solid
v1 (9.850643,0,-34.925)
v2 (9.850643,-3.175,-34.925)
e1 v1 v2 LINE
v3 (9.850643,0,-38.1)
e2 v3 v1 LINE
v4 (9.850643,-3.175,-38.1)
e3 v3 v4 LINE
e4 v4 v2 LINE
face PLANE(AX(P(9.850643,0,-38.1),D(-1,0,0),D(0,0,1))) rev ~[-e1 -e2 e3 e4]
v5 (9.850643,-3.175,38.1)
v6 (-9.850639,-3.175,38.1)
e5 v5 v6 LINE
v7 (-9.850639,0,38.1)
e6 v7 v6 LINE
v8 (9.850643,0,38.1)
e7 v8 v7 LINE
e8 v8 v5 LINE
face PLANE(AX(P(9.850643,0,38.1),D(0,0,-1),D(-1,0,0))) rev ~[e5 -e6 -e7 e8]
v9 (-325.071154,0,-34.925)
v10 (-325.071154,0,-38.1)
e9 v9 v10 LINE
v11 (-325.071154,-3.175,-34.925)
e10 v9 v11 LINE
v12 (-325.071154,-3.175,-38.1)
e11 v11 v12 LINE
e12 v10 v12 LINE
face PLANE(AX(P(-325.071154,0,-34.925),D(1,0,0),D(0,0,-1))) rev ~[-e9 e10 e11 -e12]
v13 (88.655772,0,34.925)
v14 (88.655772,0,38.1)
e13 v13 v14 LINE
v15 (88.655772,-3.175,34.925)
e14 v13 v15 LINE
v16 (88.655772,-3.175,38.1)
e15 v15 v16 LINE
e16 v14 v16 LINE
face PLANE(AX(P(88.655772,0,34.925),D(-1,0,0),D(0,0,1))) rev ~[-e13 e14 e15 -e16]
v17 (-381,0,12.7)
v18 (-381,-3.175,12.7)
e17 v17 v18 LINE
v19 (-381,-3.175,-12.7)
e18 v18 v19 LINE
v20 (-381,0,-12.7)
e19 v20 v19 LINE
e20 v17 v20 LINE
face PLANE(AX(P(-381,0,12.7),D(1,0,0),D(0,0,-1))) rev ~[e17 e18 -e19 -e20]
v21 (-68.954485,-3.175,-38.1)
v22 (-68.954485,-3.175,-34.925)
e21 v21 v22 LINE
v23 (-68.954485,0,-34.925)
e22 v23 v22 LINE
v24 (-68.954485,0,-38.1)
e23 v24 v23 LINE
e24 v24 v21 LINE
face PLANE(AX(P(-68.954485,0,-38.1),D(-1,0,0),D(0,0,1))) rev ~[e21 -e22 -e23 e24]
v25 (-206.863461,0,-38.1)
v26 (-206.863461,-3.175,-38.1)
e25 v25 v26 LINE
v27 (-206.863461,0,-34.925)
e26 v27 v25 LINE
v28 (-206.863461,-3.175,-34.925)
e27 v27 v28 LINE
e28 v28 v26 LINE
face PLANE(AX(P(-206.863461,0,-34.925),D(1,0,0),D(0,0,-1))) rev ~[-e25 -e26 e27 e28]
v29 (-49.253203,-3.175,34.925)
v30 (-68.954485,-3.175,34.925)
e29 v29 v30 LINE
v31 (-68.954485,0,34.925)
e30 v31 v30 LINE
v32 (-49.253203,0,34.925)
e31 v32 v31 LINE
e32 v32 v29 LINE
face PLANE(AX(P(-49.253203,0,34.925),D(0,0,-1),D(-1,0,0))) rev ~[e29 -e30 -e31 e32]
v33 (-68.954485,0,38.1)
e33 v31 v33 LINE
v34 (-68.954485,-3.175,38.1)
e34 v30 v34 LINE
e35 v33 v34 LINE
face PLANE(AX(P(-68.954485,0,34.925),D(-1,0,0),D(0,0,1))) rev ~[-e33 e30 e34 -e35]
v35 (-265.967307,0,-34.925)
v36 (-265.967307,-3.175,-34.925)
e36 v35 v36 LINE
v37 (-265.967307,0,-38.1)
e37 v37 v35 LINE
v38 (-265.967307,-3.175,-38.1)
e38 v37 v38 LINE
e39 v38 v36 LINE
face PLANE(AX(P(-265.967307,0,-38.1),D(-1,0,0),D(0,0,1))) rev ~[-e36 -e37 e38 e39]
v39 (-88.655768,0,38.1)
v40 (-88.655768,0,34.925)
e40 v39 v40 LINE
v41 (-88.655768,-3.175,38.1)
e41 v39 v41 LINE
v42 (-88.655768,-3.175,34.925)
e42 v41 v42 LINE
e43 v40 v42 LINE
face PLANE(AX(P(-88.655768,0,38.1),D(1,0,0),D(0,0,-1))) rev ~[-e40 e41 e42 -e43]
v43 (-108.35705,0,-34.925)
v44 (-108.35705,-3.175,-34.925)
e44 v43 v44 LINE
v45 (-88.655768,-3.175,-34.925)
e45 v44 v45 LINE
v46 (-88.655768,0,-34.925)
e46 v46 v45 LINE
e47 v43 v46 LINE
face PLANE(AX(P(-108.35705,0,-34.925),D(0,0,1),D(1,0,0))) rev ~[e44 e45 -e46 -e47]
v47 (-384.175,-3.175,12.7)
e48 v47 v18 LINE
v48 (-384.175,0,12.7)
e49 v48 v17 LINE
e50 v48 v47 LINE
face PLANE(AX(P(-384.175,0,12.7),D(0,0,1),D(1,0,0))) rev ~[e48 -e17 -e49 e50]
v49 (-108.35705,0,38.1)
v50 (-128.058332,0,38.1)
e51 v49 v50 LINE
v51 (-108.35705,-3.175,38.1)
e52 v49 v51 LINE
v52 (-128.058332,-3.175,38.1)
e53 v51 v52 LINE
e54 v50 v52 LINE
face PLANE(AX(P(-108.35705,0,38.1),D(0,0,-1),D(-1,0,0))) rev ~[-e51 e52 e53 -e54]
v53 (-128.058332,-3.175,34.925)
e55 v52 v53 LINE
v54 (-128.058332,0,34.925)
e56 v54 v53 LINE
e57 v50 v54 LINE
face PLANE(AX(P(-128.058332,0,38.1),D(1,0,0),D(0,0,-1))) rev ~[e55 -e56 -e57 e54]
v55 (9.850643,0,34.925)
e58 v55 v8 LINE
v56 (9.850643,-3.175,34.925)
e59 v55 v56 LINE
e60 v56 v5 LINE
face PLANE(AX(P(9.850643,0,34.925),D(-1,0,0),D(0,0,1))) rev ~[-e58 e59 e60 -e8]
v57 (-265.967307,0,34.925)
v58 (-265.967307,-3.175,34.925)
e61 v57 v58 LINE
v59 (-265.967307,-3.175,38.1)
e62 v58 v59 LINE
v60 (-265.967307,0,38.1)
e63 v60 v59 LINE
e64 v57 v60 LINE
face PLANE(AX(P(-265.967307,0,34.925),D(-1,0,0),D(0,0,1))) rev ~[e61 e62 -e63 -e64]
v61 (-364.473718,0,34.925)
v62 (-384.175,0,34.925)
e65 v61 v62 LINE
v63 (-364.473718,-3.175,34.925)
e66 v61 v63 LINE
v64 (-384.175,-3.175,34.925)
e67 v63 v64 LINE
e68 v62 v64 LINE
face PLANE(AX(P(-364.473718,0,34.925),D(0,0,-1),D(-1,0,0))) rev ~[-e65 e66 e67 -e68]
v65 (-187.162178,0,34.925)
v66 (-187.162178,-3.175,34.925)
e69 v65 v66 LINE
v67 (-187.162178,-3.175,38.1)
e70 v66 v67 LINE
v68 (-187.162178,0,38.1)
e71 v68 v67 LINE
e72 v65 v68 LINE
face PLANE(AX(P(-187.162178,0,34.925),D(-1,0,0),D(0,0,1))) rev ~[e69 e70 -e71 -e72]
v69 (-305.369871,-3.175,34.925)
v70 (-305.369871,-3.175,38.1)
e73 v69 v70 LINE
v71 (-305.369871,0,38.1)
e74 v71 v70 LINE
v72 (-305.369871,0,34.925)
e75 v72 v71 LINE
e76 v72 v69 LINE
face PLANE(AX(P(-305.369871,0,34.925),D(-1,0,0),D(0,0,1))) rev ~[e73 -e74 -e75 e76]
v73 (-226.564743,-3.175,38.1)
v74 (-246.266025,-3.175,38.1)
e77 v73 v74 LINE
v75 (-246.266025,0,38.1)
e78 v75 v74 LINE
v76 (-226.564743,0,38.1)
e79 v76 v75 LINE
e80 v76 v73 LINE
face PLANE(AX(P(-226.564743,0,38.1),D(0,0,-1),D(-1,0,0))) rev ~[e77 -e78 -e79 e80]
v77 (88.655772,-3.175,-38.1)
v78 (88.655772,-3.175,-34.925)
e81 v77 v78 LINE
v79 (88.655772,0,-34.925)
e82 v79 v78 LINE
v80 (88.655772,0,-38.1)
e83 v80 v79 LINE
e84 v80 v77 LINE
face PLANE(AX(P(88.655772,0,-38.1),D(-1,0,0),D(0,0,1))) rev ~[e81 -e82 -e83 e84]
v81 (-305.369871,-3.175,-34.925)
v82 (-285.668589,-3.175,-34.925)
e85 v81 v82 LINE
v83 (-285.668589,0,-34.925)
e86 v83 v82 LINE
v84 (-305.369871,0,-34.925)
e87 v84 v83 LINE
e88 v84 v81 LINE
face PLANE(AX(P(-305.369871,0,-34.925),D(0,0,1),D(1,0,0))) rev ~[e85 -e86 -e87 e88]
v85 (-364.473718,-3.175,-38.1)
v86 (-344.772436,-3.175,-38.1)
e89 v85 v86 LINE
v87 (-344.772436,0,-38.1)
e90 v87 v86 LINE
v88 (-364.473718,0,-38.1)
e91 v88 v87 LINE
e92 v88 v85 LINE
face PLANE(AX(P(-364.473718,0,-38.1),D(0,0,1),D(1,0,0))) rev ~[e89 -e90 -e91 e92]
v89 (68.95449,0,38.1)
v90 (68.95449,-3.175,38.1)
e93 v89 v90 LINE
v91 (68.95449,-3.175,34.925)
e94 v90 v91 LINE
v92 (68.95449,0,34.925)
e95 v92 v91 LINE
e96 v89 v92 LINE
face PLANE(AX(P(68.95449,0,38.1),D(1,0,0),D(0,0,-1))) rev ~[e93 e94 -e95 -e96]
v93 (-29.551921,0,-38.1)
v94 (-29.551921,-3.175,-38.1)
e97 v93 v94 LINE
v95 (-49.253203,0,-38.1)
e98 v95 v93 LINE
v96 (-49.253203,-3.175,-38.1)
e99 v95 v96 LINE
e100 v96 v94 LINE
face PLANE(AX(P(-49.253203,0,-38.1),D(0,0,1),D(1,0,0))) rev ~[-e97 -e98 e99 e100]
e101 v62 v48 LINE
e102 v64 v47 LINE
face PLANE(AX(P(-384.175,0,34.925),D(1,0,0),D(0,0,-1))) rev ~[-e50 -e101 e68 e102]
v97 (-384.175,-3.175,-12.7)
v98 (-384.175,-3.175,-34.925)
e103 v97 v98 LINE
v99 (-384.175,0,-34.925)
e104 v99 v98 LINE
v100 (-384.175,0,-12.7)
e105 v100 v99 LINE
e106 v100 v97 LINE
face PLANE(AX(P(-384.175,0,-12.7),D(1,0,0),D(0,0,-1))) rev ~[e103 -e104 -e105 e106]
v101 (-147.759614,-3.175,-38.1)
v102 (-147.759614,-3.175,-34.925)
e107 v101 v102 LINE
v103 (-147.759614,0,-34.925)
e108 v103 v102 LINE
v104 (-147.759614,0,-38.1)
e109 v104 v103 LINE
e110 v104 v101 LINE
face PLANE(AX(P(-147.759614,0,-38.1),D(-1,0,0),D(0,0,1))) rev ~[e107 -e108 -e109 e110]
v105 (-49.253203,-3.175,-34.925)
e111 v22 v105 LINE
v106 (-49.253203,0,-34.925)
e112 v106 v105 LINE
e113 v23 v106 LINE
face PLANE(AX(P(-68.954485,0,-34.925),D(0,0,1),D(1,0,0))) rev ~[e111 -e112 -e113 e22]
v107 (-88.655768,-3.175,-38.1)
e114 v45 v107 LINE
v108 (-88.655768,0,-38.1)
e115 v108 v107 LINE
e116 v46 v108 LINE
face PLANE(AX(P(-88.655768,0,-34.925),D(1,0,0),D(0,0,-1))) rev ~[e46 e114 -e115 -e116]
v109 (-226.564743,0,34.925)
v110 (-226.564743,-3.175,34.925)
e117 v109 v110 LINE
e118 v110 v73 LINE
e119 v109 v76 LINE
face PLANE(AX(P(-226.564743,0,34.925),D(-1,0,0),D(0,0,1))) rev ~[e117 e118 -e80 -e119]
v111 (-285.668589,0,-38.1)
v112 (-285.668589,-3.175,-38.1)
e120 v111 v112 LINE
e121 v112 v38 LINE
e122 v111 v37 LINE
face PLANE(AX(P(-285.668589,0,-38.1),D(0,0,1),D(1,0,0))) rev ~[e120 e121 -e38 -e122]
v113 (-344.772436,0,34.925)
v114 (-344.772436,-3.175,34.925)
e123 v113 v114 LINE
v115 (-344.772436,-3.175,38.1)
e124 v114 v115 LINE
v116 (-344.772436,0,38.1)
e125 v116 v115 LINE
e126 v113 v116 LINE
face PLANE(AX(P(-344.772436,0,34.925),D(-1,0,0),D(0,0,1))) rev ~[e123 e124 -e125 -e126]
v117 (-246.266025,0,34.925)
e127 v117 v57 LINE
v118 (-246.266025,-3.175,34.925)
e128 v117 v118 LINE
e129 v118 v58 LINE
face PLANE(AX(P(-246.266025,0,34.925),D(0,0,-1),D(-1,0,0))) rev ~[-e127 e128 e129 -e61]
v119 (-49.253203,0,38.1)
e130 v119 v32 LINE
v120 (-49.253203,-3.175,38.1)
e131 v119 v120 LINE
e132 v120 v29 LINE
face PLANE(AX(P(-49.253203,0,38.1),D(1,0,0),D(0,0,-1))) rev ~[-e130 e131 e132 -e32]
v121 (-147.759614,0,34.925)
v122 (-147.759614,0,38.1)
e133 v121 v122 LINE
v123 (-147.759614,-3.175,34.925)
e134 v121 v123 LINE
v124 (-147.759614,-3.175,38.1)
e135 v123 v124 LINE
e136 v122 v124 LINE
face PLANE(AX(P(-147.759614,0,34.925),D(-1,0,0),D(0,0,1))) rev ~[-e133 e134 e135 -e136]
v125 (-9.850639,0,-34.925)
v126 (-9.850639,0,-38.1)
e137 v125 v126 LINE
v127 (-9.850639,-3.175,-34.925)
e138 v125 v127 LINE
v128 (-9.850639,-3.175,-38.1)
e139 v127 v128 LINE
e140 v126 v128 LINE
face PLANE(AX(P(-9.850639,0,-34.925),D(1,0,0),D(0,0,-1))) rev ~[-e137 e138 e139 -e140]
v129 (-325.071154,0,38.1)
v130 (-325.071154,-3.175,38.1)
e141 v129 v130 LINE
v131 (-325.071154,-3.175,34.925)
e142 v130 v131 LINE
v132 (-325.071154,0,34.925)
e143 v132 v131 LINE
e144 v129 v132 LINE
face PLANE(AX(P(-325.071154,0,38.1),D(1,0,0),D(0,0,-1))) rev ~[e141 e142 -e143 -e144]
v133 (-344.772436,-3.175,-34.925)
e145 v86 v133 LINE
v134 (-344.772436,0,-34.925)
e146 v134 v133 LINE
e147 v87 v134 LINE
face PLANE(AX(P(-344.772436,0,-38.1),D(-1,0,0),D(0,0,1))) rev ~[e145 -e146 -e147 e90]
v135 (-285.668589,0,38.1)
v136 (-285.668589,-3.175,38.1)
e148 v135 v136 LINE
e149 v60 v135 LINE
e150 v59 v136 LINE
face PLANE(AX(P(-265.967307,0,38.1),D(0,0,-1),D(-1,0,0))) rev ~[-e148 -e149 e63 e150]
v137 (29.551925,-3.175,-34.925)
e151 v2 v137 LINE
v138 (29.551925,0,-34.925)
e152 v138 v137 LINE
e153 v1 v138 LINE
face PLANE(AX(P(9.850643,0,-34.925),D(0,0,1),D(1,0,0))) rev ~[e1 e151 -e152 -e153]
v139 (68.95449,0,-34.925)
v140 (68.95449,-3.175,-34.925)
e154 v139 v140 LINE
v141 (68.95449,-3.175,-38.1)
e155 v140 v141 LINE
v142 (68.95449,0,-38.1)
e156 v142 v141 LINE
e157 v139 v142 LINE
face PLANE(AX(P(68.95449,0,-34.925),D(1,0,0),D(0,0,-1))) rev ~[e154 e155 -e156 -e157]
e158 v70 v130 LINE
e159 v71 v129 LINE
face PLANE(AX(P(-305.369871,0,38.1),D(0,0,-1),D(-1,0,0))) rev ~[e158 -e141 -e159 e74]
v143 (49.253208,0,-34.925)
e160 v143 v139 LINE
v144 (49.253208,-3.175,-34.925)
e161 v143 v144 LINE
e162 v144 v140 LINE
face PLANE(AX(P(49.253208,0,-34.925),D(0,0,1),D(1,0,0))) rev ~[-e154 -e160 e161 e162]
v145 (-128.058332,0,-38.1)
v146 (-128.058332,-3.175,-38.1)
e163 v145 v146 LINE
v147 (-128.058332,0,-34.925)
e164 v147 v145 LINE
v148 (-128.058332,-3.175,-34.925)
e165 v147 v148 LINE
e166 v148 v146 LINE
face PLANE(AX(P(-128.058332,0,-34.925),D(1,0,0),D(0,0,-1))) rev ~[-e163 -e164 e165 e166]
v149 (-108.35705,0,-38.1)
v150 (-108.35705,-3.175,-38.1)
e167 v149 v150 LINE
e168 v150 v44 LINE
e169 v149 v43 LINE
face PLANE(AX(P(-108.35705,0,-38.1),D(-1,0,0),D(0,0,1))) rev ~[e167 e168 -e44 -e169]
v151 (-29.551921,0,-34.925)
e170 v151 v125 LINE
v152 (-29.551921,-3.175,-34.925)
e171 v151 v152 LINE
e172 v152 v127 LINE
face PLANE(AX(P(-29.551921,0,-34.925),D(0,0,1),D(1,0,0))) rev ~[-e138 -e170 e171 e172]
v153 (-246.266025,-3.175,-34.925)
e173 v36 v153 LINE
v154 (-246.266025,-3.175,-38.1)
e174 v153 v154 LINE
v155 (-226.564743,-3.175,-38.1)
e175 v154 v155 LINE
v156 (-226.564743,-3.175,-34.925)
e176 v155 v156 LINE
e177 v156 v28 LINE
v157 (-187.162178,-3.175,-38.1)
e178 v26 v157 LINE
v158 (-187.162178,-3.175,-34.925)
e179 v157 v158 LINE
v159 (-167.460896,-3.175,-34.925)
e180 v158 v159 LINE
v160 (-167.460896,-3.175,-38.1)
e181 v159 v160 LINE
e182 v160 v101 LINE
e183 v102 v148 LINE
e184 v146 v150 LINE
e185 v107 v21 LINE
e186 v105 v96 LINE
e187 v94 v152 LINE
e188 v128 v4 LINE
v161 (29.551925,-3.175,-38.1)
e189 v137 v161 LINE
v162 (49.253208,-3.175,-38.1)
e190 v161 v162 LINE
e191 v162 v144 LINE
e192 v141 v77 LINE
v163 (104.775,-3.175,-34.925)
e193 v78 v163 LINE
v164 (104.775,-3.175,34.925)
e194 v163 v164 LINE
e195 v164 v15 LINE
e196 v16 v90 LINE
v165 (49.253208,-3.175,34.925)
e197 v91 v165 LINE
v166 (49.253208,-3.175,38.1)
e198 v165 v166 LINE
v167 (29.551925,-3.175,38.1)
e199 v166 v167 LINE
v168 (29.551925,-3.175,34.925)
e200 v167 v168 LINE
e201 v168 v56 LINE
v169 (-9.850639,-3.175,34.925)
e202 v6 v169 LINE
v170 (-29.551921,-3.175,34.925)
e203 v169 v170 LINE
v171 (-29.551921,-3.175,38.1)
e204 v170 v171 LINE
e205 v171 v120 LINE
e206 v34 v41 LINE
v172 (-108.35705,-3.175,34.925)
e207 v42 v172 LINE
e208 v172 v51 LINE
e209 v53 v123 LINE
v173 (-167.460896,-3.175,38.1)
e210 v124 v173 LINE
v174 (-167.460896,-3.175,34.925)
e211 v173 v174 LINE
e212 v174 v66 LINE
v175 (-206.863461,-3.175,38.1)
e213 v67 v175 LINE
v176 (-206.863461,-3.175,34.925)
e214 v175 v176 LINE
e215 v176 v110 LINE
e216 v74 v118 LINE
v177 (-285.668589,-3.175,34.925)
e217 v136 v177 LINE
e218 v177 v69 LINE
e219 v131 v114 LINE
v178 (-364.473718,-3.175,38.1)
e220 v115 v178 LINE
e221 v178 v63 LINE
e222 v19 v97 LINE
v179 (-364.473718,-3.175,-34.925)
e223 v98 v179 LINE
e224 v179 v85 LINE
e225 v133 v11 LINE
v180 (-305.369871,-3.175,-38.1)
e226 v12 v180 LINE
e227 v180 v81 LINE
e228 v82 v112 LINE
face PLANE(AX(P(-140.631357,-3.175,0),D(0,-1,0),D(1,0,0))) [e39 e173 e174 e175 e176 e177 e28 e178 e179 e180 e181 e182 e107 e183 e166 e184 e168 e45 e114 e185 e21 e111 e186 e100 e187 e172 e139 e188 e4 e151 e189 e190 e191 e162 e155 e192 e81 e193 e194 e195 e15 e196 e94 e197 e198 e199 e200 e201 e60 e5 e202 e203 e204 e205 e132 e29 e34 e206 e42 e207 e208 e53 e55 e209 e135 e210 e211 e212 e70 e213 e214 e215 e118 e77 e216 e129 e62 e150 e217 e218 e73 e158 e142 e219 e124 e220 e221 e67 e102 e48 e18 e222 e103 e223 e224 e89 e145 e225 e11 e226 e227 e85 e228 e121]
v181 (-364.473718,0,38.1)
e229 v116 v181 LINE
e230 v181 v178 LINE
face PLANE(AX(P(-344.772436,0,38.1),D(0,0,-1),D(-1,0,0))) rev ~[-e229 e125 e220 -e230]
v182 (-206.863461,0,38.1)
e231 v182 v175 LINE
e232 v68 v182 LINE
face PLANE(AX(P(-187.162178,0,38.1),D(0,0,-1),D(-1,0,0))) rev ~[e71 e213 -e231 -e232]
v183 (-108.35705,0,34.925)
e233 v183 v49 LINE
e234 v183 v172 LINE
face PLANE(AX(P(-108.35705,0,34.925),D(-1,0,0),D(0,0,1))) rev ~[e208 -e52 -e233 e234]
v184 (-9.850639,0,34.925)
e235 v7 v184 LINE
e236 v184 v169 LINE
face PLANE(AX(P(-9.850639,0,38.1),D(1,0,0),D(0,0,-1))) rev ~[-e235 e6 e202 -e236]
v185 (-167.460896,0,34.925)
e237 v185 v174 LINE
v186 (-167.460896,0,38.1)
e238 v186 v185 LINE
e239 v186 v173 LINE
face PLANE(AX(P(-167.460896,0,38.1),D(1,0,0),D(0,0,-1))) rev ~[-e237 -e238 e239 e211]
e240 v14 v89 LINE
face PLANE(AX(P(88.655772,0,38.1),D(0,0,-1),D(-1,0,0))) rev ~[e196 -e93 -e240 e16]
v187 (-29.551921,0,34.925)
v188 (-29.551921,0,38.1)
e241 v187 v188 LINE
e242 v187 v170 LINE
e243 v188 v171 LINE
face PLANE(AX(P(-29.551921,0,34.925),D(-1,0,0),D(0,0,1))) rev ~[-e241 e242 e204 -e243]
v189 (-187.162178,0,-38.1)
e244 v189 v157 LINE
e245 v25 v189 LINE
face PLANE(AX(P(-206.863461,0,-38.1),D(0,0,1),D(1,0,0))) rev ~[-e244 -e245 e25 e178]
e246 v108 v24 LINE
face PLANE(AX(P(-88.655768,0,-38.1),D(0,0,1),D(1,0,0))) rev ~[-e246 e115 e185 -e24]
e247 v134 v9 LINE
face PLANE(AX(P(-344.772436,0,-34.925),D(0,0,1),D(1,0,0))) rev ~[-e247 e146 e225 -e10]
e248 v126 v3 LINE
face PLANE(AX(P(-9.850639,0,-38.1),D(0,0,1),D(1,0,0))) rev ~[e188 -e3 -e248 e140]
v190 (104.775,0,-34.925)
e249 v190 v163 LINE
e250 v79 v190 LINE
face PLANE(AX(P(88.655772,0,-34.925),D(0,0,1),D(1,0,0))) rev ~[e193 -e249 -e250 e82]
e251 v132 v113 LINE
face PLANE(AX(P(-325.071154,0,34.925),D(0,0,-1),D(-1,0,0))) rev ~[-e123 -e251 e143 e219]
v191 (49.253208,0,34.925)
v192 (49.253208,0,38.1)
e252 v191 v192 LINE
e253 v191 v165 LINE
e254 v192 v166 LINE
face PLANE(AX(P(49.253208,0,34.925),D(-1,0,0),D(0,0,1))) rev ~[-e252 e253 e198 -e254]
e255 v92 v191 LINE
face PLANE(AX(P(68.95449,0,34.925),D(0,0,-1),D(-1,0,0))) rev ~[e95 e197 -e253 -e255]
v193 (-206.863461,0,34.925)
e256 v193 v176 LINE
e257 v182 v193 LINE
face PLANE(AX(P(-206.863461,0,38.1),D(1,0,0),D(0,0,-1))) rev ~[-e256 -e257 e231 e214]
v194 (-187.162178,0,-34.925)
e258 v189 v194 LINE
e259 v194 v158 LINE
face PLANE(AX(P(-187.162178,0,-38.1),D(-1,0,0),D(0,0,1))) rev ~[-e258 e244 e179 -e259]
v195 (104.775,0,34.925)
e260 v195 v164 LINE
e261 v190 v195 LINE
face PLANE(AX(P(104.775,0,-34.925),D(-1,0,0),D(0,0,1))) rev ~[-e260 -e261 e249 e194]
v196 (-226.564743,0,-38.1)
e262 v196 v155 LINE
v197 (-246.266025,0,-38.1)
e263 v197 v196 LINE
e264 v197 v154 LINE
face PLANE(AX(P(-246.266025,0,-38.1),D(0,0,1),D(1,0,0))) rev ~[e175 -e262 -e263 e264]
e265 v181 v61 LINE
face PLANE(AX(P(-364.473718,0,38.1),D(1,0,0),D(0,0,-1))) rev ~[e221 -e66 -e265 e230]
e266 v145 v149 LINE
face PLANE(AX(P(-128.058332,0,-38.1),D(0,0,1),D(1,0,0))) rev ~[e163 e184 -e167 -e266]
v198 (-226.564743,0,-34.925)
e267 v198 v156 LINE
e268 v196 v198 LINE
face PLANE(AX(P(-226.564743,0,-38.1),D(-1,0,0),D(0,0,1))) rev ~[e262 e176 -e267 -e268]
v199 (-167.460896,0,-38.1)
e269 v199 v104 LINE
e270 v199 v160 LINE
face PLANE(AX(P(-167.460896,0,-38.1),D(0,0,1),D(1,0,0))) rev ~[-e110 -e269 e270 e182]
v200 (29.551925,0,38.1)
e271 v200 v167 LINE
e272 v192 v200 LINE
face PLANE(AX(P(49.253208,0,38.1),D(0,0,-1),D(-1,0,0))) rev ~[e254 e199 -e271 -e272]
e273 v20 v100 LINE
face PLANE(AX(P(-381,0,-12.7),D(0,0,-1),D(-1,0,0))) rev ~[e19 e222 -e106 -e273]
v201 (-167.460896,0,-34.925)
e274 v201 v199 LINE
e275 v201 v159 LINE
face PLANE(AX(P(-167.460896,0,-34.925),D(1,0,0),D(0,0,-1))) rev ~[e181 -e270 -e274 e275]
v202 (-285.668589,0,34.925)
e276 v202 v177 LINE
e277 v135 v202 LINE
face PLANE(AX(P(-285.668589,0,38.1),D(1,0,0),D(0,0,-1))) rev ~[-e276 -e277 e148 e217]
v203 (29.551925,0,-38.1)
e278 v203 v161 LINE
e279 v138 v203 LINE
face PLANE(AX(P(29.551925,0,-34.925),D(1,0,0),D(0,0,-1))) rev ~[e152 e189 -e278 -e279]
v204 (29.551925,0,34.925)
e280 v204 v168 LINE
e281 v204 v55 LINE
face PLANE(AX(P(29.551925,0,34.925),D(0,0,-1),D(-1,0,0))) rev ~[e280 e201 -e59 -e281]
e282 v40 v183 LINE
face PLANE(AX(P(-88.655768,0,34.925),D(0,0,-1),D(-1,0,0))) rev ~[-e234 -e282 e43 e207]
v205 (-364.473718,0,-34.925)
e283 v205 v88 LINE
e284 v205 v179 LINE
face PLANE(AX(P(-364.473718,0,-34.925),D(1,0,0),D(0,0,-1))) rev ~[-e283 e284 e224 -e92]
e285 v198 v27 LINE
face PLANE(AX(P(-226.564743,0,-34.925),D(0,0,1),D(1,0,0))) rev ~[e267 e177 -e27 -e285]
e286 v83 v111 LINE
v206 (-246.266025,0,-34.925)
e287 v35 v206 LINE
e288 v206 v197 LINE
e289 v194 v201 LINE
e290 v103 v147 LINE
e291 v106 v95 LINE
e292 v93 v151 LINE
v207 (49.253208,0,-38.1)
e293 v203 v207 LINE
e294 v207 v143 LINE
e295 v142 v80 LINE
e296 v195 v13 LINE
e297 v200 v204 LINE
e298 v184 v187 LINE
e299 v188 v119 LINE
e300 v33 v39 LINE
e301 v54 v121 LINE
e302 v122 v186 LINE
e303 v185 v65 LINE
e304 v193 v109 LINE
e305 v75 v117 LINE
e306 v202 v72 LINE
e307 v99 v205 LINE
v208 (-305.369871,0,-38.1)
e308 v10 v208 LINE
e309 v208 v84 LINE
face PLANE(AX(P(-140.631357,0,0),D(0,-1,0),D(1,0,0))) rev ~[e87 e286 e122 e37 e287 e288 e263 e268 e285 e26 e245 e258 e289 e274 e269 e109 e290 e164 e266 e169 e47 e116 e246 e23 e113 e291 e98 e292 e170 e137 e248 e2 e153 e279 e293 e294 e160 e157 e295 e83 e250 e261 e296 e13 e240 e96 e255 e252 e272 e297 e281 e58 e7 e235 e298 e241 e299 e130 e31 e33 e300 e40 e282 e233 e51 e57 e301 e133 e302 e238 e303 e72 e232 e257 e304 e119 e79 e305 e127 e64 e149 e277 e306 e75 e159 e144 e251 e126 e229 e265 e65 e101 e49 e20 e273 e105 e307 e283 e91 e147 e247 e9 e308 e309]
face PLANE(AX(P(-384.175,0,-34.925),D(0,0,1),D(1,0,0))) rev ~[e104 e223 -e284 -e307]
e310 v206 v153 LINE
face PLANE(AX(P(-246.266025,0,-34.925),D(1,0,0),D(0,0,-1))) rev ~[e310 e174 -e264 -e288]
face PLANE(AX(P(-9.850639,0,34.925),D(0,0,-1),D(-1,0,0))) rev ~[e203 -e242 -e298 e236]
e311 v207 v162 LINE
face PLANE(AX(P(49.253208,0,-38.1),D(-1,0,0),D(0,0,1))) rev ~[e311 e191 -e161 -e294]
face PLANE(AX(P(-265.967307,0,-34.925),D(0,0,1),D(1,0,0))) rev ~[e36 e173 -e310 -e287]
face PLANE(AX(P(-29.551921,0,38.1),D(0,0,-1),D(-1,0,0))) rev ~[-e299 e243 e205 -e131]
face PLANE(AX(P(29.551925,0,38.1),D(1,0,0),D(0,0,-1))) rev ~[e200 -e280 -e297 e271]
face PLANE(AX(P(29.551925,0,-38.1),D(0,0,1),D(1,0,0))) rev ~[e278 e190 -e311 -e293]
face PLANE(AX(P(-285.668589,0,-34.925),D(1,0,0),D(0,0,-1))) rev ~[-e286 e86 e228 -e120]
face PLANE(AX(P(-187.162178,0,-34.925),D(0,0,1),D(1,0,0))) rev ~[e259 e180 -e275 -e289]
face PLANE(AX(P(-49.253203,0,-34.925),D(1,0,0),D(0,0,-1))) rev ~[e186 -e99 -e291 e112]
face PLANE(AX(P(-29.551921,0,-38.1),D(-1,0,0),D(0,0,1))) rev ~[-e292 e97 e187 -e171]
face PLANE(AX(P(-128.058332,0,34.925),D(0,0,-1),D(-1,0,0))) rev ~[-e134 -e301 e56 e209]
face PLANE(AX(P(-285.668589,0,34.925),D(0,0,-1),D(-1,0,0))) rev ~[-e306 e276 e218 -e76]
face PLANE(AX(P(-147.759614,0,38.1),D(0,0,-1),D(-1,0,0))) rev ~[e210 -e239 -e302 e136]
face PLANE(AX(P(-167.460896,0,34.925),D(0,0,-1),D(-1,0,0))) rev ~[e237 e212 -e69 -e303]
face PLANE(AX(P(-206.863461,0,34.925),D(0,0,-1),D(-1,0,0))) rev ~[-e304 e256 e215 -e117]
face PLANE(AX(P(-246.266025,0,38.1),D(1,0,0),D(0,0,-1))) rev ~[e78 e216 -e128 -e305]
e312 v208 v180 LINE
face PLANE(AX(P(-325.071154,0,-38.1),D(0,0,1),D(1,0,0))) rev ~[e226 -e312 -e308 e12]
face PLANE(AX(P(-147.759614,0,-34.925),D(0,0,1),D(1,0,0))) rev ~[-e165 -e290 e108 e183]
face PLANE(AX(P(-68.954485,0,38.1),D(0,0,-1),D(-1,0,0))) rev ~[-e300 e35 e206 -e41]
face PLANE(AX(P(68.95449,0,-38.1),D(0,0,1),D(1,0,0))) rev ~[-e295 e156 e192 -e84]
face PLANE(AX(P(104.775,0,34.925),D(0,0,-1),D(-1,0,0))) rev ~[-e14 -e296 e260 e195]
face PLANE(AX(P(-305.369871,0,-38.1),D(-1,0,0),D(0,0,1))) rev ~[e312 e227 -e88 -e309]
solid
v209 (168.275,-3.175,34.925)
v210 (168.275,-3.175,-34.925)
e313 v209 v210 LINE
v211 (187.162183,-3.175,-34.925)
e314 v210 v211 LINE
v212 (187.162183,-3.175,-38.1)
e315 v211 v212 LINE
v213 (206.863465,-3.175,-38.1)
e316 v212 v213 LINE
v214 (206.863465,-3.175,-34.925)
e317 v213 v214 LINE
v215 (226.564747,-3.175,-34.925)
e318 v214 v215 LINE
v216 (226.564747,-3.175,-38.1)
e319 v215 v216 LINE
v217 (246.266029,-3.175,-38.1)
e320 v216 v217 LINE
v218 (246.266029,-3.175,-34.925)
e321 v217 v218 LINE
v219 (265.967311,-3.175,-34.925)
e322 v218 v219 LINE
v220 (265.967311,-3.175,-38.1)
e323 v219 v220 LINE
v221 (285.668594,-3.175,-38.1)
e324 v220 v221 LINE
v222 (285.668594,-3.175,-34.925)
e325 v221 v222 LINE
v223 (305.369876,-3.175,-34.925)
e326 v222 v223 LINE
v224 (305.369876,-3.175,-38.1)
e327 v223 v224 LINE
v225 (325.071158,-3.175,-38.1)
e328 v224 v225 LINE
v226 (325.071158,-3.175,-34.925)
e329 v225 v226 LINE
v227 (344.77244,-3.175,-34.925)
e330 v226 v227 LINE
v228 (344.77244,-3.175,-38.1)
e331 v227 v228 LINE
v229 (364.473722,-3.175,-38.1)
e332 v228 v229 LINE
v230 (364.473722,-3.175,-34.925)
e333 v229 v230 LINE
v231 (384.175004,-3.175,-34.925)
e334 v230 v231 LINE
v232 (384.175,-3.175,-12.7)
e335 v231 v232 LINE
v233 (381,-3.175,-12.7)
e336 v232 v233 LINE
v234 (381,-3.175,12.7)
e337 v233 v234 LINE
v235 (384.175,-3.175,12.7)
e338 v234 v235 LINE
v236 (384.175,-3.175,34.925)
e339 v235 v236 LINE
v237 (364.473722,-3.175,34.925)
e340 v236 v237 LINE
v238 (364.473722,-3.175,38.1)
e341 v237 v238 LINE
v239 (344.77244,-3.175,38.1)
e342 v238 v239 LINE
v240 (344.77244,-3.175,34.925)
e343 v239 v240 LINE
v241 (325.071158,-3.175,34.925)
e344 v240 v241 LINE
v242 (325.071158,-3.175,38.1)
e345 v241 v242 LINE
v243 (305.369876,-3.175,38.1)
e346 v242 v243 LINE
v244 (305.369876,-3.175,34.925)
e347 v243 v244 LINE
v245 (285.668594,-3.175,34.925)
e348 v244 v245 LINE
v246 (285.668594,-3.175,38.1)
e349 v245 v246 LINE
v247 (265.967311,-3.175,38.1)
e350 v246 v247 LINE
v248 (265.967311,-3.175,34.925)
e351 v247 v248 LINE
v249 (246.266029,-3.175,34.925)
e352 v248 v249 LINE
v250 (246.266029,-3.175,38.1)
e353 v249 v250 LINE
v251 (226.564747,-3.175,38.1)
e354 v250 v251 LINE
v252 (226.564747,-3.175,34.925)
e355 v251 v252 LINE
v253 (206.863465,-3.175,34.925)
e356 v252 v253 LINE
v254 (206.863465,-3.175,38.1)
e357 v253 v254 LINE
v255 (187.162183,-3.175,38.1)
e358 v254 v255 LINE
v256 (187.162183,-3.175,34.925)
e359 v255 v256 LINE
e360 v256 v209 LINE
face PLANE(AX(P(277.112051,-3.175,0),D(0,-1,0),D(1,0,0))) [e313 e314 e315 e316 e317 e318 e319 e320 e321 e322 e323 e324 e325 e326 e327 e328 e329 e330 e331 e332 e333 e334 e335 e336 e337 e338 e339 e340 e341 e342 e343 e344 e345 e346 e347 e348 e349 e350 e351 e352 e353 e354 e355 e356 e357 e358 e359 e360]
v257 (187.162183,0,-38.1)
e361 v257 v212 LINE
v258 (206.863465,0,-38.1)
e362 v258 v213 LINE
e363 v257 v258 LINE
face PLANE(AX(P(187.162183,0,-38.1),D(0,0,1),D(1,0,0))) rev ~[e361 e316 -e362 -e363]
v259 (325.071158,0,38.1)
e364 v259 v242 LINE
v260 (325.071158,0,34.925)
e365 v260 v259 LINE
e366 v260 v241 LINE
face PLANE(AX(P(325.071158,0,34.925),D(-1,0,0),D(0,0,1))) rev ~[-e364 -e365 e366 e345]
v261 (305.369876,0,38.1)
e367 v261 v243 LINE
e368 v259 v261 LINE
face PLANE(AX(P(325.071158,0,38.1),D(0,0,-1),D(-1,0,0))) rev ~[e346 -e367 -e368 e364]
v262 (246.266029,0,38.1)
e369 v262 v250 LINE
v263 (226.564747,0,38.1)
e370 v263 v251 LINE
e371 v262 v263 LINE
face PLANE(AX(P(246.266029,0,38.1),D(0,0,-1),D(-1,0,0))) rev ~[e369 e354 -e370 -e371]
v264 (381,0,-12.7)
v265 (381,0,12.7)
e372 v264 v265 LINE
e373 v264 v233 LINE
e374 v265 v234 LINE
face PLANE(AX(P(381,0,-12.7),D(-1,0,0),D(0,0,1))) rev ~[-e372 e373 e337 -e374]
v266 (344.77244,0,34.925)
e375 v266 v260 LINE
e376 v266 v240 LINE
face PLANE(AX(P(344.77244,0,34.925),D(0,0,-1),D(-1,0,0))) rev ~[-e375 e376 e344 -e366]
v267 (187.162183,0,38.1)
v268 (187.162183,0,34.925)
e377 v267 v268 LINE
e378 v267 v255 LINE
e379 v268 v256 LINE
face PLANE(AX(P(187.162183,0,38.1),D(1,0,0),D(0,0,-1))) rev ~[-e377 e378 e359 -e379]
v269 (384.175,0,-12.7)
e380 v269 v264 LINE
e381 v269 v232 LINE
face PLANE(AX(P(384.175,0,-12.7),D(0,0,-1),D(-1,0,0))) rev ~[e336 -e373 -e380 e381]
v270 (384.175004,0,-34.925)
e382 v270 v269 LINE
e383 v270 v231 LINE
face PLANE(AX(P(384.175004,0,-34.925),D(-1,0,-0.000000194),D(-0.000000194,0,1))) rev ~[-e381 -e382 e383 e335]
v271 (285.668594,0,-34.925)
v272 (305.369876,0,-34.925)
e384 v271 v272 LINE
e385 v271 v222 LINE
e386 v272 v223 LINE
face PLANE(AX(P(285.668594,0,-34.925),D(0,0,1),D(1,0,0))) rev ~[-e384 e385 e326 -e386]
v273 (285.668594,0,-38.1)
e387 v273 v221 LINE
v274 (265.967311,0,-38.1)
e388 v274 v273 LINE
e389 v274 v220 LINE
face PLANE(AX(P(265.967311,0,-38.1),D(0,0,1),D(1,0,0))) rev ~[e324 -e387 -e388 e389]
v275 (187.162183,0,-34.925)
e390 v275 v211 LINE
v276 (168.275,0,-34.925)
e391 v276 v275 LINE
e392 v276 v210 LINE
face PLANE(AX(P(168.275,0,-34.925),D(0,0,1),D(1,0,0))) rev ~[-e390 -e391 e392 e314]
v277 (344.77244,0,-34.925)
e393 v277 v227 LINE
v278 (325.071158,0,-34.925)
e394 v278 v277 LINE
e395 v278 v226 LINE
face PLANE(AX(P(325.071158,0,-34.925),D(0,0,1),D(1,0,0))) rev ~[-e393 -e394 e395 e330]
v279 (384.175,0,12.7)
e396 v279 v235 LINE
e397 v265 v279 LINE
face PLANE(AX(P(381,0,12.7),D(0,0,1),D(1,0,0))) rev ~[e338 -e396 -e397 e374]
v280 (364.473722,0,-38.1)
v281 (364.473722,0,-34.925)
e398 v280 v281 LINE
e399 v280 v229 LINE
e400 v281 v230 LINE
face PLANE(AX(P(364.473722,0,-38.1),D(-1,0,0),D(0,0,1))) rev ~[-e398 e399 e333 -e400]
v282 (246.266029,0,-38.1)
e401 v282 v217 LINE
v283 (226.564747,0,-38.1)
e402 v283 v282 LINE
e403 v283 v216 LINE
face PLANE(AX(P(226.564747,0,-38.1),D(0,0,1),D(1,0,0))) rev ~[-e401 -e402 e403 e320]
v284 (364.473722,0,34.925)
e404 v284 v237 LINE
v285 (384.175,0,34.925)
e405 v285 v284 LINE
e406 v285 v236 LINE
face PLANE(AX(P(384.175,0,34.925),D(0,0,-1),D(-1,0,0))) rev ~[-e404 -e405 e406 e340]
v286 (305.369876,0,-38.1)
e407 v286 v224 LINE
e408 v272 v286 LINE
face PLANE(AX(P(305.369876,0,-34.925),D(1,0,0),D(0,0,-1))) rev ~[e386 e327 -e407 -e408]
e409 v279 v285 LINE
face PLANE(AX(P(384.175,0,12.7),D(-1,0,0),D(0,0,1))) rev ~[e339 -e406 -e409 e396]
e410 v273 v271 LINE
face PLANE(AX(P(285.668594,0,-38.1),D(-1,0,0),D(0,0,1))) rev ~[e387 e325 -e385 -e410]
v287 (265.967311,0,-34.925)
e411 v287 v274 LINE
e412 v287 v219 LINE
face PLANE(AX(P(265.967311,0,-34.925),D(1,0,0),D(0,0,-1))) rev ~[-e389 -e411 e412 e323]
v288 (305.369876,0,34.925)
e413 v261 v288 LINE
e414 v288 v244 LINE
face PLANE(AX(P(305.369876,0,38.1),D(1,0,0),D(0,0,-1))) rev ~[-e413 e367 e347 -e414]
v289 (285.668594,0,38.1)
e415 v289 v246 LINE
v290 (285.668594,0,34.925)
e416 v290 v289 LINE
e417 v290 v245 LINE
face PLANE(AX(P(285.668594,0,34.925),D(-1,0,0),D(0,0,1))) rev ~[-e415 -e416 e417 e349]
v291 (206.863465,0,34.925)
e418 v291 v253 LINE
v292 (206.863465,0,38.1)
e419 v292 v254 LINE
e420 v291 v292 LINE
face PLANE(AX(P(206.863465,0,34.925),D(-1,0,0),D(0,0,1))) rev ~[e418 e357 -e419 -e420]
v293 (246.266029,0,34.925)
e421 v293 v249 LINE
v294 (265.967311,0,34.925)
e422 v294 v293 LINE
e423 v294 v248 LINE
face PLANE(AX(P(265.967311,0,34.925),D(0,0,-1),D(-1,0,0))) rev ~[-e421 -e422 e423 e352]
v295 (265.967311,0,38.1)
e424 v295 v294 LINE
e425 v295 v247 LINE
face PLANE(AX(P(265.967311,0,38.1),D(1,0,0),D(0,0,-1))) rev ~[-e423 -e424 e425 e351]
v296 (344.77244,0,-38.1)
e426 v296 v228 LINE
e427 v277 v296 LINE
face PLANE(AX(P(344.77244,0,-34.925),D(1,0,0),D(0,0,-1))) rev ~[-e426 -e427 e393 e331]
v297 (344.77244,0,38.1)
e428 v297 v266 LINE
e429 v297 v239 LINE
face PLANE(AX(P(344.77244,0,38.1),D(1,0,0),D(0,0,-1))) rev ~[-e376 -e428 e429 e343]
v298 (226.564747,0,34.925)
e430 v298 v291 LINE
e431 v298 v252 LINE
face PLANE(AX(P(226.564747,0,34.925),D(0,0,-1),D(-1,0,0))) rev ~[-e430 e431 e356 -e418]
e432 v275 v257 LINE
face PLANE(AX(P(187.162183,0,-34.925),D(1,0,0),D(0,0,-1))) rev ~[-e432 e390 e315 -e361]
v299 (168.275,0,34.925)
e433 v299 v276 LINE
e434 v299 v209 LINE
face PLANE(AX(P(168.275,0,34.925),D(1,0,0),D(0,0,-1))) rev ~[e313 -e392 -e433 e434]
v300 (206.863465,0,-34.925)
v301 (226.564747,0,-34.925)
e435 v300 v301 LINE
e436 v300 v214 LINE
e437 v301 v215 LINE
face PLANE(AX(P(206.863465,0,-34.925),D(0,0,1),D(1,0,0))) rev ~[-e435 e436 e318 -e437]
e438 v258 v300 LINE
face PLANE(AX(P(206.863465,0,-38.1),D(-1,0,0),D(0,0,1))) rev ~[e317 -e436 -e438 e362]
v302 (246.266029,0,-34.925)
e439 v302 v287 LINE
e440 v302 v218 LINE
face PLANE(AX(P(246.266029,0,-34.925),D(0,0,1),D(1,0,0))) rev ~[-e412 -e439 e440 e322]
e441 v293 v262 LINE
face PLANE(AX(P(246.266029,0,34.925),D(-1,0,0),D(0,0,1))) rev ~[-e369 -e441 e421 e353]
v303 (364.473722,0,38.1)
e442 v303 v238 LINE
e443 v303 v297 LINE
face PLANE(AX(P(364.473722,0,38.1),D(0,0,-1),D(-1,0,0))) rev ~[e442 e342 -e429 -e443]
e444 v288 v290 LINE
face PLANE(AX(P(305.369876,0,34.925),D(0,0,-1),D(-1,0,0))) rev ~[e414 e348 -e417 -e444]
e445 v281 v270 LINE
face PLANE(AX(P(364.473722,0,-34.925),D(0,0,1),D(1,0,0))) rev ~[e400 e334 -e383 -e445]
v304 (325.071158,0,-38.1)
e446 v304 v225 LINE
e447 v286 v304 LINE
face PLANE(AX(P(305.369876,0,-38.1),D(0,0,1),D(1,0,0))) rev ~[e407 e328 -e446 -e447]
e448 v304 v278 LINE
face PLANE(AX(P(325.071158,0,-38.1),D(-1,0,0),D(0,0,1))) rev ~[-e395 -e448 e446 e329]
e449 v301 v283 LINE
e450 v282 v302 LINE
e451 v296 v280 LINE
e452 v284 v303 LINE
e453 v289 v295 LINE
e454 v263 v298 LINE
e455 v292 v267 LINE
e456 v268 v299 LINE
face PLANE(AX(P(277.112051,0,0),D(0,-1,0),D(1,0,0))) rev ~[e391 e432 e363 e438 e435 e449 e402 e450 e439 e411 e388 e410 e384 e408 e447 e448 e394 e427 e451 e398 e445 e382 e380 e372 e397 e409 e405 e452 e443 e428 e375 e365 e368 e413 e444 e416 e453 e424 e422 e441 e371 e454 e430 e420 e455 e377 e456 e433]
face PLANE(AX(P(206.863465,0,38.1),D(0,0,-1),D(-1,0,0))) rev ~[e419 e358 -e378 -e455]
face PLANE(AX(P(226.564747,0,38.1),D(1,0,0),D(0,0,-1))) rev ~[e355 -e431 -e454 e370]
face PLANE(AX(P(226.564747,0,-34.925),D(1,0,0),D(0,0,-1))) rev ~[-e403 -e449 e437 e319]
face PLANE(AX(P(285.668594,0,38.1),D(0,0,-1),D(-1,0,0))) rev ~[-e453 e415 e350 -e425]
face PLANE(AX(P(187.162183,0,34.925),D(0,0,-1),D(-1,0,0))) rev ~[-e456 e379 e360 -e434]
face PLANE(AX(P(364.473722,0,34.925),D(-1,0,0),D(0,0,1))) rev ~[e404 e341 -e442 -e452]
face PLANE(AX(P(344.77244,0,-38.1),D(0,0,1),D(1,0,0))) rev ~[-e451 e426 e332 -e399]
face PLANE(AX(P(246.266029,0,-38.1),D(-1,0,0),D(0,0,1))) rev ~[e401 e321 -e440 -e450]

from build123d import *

# Parameters (mm, degrees)
F1_DEPTH = 3.175


# Not quite as in the source:
# - ends of sketch curves that miss each other by under 0.0002 mm in the source are joined


with BuildPart() as f1:
    # F0 (on Front) → F1 (new body)
    with BuildSketch(Plane.XZ):
        Polygon((-384.175, 34.925), (-384.175, 12.7), (-381, 12.7), (-381, -12.7), (-384.175, -12.7), (-384.175, -34.925), (-364.473717838, -34.925), (-364.473717838, -38.1), (-344.772435676, -38.1), (-344.772435676, -34.925), (-325.071153514, -34.925), (-325.071153514, -38.1), (-305.369871352, -38.1), (-305.369871352, -34.925), (-285.66858919, -34.925), (-285.66858919, -38.1), (-265.967307028, -38.1), (-265.967307028, -34.925), (-246.266024866, -34.925), (-246.266024866, -38.1), (-226.564742704, -38.1), (-226.564742704, -34.925), (-206.863460542, -34.925), (-206.863460542, -38.1), (-187.16217838, -38.1), (-187.16217838, -34.925), (-167.460896218, -34.925), (-167.460896218, -38.1), (-147.759614056, -38.1), (-147.759614056, -34.925), (-128.058331894, -34.925), (-128.058331894, -38.1), (-108.357049732, -38.1), (-108.357049732, -34.925), (-88.65576757, -34.925), (-88.65576757, -38.1), (-68.954485408, -38.1), (-68.954485408, -34.925), (-49.253203246, -34.925), (-49.253203246, -38.1), (-29.551921084, -38.1), (-29.551921084, -34.925), (-9.850638922, -34.925), (-9.850638922, -38.1), (9.85064324, -38.1), (9.85064324, -34.925), (29.551925402, -34.925), (29.551925402, -38.1), (49.253207564, -38.1), (49.253207564, -34.925), (68.954489726, -34.925), (68.954489726, -38.1), (88.655771888, -38.1), (88.655771888, -34.925), (104.775, -34.925), (104.775, 34.925), (88.655771888, 34.925), (88.655771888, 38.1), (68.954489726, 38.1), (68.954489726, 34.925), (49.253207564, 34.925), (49.253207564, 38.1), (29.551925402, 38.1), (29.551925402, 34.925), (9.85064324, 34.925), (9.85064324, 38.1), (-9.850638922, 38.1), (-9.850638922, 34.925), (-29.551921084, 34.925), (-29.551921084, 38.1), (-49.253203246, 38.1), (-49.253203246, 34.925), (-68.954485408, 34.925), (-68.954485408, 38.1), (-88.65576757, 38.1), (-88.65576757, 34.925), (-108.357049732, 34.925), (-108.357049732, 38.1), (-128.058331894, 38.1), (-128.058331894, 34.925), (-147.759614056, 34.925), (-147.759614056, 38.1), (-167.460896218, 38.1), (-167.460896218, 34.925), (-187.16217838, 34.925), (-187.16217838, 38.1), (-206.863460542, 38.1), (-206.863460542, 34.925), (-226.564742704, 34.925), (-226.564742704, 38.1), (-246.266024866, 38.1), (-246.266024866, 34.925), (-265.967307028, 34.925), (-265.967307028, 38.1), (-285.66858919, 38.1), (-285.66858919, 34.925), (-305.369871352, 34.925), (-305.369871352, 38.1), (-325.071153514, 38.1), (-325.071153514, 34.925), (-344.772435676, 34.925), (-344.772435676, 38.1), (-364.473717838, 38.1), (-364.473717838, 34.925), align=None)
    extrude(amount=F1_DEPTH)


with BuildPart() as f1b:
    # F0 (on Front) → F1, piece 2 (new body)
    with BuildSketch(Plane.XZ):
        Polygon((187.162182698, 34.925), (168.275, 34.925), (168.275, -34.925), (187.162182698, -34.925), (187.162182698, -38.1), (206.86346486, -38.1), (206.86346486, -34.925), (226.564747022, -34.925), (226.564747022, -38.1), (246.266029184, -38.1), (246.266029184, -34.925), (265.967311346, -34.925), (265.967311346, -38.1), (285.668593508, -38.1), (285.668593508, -34.925), (305.36987567, -34.925), (305.36987567, -38.1), (325.071157832, -38.1), (325.071157832, -34.925), (344.772439994, -34.925), (344.772439994, -38.1), (364.473722156, -38.1), (364.473722156, -34.925), (384.175004318, -34.925), (384.175, -12.7), (381, -12.7), (381, 12.7), (384.175, 12.7), (384.175, 34.925), (364.473722156, 34.925), (364.473722156, 38.1), (344.772439994, 38.1), (344.772439994, 34.925), (325.071157832, 34.925), (325.071157832, 38.1), (305.36987567, 38.1), (305.36987567, 34.925), (285.668593508, 34.925), (285.668593508, 38.1), (265.967311346, 38.1), (265.967311346, 34.925), (246.266029184, 34.925), (246.266029184, 38.1), (226.564747022, 38.1), (226.564747022, 34.925), (206.86346486, 34.925), (206.86346486, 38.1), (187.162182698, 38.1), align=None)
    extrude(amount=F1_DEPTH)


solid = Compound([f1.part, f1b.part])
